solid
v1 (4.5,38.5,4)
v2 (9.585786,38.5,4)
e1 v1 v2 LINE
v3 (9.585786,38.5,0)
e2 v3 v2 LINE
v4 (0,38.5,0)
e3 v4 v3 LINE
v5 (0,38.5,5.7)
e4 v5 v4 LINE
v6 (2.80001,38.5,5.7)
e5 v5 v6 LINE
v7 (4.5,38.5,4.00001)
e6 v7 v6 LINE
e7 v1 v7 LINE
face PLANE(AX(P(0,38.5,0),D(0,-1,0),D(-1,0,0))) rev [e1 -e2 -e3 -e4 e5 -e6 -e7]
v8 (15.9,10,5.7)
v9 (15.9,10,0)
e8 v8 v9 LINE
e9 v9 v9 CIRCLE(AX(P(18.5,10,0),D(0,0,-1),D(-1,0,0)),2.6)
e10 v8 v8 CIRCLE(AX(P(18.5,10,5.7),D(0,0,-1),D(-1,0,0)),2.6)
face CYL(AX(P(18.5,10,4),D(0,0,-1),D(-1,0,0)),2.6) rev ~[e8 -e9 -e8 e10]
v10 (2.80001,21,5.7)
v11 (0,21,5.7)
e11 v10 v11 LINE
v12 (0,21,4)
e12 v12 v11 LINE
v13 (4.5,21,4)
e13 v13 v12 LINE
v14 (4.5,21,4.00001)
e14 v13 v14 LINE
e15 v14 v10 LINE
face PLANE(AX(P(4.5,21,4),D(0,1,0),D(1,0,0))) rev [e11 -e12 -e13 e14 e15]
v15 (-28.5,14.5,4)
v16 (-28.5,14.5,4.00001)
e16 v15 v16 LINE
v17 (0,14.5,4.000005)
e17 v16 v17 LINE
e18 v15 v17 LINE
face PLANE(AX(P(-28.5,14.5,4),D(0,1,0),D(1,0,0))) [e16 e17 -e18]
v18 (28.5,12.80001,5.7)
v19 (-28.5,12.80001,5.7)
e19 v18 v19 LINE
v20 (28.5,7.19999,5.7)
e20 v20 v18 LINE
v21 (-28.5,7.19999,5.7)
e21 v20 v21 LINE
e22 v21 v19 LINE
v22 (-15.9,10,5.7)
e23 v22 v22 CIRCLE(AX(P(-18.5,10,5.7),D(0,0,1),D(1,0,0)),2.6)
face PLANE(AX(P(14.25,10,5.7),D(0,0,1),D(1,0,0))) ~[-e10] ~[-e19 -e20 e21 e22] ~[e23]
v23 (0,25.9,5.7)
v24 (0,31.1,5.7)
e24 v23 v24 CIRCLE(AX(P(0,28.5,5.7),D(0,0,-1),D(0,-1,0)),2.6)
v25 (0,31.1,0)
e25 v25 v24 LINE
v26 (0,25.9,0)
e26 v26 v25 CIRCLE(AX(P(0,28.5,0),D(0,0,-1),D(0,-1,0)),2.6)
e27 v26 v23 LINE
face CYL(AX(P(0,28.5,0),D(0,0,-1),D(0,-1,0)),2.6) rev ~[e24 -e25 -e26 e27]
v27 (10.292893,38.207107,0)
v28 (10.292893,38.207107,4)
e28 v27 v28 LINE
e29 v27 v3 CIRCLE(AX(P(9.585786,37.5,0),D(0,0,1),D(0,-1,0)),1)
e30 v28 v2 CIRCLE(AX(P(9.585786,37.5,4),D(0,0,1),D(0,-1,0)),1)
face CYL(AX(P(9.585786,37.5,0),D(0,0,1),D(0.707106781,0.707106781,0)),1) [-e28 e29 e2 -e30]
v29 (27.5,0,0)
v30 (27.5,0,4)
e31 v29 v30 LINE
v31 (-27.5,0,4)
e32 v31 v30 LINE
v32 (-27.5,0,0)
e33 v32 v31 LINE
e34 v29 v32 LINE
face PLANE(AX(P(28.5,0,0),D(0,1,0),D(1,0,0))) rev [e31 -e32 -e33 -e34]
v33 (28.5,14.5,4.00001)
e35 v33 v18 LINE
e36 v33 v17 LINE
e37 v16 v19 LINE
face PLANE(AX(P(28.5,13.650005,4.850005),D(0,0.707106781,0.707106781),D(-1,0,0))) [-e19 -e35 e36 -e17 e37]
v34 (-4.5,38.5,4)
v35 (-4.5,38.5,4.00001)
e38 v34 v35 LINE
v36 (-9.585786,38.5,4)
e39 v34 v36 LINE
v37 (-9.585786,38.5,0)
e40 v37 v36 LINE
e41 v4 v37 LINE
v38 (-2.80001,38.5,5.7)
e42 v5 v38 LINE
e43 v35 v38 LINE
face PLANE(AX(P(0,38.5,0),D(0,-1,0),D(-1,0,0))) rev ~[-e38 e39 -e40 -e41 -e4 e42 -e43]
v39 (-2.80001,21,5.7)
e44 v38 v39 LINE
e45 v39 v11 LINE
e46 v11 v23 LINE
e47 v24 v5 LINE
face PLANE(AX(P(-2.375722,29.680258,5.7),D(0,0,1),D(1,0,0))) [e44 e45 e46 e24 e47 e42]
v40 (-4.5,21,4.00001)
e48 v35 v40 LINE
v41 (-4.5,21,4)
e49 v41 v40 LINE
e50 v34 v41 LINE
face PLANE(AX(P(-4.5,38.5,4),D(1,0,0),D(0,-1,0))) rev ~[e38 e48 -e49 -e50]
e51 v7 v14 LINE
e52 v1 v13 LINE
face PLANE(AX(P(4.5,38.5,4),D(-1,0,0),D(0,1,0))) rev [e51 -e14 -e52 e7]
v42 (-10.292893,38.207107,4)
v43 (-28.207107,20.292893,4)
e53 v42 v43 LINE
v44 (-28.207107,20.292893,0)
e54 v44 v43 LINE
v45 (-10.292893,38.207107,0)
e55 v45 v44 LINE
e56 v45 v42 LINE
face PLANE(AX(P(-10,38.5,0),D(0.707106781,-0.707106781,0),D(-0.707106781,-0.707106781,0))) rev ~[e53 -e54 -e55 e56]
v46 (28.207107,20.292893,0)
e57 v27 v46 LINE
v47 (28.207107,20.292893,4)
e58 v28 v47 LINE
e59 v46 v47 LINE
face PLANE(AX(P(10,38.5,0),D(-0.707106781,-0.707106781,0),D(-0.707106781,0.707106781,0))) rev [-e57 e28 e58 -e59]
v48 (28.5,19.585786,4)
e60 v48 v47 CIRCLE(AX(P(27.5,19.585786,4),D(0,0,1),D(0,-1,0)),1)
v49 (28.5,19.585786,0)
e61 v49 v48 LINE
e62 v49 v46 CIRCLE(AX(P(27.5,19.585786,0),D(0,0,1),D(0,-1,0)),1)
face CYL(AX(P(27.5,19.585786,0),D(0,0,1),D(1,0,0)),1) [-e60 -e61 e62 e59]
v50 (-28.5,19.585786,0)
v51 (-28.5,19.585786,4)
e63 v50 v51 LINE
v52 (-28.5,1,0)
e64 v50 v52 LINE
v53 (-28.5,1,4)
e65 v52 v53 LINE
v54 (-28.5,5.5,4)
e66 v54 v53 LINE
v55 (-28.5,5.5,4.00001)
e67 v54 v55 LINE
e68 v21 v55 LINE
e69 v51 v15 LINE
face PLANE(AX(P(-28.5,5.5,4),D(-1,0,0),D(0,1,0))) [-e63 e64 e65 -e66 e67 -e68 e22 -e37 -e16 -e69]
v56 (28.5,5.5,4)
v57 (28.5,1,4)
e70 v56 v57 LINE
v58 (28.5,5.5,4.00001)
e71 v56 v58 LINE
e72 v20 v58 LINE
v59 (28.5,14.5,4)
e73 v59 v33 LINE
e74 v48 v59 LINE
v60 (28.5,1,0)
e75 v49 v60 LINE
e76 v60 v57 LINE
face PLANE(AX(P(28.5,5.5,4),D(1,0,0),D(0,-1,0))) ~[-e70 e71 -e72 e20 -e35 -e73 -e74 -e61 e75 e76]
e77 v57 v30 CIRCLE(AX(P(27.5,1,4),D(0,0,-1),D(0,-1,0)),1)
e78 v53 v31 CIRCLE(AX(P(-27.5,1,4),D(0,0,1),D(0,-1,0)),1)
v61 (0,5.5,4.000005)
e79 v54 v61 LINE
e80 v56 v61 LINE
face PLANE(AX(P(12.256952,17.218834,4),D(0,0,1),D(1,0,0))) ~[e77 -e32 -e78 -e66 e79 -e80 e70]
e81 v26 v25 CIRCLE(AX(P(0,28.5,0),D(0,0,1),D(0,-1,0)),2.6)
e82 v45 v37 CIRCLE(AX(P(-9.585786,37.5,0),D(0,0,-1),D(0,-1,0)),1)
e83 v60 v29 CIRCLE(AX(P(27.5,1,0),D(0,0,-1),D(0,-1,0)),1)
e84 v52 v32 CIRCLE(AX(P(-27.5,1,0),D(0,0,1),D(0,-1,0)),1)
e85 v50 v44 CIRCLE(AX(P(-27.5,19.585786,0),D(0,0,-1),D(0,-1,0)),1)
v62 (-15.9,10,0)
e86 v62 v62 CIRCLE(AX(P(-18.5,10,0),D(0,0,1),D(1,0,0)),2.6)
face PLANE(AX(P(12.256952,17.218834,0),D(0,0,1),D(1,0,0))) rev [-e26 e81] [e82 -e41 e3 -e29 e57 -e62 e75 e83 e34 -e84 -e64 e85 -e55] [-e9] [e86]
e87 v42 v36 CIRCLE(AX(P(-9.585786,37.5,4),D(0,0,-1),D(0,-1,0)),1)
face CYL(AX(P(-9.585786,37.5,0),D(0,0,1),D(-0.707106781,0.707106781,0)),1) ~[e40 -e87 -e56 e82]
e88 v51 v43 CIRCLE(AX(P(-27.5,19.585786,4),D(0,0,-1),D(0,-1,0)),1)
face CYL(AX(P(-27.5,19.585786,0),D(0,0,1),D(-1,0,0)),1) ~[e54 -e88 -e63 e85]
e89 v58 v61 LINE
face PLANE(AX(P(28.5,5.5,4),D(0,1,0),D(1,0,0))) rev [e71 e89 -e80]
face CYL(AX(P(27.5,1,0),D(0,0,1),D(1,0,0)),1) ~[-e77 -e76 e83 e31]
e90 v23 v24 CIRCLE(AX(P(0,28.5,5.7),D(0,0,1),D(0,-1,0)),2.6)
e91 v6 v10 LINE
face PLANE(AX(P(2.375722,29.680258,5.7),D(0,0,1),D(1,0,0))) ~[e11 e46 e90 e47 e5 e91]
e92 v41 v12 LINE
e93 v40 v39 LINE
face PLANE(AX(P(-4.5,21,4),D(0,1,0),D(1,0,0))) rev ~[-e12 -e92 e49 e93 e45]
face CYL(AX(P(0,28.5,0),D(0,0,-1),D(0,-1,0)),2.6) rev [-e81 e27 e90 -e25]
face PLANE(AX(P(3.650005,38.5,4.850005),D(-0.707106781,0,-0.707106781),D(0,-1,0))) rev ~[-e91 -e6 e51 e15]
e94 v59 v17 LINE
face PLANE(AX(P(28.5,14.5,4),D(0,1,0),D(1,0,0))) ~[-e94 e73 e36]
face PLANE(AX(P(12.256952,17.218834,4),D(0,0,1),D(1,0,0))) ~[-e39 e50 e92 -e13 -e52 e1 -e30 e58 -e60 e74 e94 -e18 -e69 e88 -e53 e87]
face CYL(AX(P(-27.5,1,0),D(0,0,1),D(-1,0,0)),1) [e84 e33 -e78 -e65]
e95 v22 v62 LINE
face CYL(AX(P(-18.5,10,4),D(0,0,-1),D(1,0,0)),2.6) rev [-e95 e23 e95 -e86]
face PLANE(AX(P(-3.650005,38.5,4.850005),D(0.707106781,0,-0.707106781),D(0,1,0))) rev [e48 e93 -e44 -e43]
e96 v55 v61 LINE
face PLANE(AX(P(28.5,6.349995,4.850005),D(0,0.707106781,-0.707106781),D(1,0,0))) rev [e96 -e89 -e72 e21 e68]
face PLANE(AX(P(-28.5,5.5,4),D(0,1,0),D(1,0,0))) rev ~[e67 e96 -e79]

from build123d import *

# Parameters (mm, degrees)
F0_R     = 2.6
F1_DEPTH = 4
F2_W     = 28.5
F2_H     = 9
F2_R     = 2.6
F3_DEPTH = 1.7
F4_SIZE  = 1.69999
F5_R     = 1


# Not quite as in the source:
# - a fillet or chamfer is up to 0.001 mm smaller than in the source, because OpenCascade refuses the exact size


with BuildPart() as f1:
    # F0 (on Top) → F1 (new body)
    with BuildSketch(Plane.XY):
        with BuildLine():
            Line((-28.5, 0), (0, 0))
            Line((0, 0), (0, 25.9))
            ThreePointArc((0, 25.9), (-2.6, 28.5), (0, 31.1))
            Line((0, 31.1), (0, 38.5))
            Line((0, 38.5), (-10, 38.5))
            Line((-10, 38.5), (-28.5, 20))
            Line((-28.5, 20), (-28.5, 0))
        make_face()
        with Locations((-18.5, 10)):
            Circle(F0_R, mode=Mode.SUBTRACT)
    extrude(amount=F1_DEPTH)

    # F2 (on face) → F3 (join)
    with BuildSketch(Plane.XY.offset(4)):
        with Locations((-14.25, 10)):
            Rectangle(F2_W, F2_H)
        with Locations((-18.5, 10)):
            Circle(F2_R, mode=Mode.SUBTRACT)
        with BuildLine():
            ThreePointArc((0, 25.9), (-2.6, 28.5), (0, 31.1))
            Line((0, 31.1), (0, 38.5))
            Line((0, 38.5), (-4.5, 38.5))
            Line((-4.5, 38.5), (-4.5, 21))
            Line((-4.5, 21), (0, 21))
            Line((0, 21), (0, 25.9))
        make_face()
    extrude(amount=F3_DEPTH)

    # F4 (size 1.7 in the source; OpenCascade refuses exactly that, so slightly less here)
    f4_edges = [f1.edges().sort_by_distance(p)[0] for p in [
        (-14.25, 14.5, 5.7),
        (-14.25, 5.5, 5.7),
        (-4.5, 29.75, 5.7),
    ]]
    chamfer(f4_edges, length=F4_SIZE)

    # F5
    f5_edges = [f1.edges().sort_by_distance(p)[0] for p in [
        (-10, 38.5, 2),
        (-28.5, 20, 2),
        (-28.5, 0, 2),
    ]]
    fillet(f5_edges, radius=F5_R)

    # F6: F1 across face


with BuildPart() as f1_1:
    add(f1.part)
    add(f1.part.mirror(Plane(origin=(0, 34.8, 2.85), x_dir=(0, 1, 0), z_dir=(1, 0, 0))))


solid = f1_1.part
